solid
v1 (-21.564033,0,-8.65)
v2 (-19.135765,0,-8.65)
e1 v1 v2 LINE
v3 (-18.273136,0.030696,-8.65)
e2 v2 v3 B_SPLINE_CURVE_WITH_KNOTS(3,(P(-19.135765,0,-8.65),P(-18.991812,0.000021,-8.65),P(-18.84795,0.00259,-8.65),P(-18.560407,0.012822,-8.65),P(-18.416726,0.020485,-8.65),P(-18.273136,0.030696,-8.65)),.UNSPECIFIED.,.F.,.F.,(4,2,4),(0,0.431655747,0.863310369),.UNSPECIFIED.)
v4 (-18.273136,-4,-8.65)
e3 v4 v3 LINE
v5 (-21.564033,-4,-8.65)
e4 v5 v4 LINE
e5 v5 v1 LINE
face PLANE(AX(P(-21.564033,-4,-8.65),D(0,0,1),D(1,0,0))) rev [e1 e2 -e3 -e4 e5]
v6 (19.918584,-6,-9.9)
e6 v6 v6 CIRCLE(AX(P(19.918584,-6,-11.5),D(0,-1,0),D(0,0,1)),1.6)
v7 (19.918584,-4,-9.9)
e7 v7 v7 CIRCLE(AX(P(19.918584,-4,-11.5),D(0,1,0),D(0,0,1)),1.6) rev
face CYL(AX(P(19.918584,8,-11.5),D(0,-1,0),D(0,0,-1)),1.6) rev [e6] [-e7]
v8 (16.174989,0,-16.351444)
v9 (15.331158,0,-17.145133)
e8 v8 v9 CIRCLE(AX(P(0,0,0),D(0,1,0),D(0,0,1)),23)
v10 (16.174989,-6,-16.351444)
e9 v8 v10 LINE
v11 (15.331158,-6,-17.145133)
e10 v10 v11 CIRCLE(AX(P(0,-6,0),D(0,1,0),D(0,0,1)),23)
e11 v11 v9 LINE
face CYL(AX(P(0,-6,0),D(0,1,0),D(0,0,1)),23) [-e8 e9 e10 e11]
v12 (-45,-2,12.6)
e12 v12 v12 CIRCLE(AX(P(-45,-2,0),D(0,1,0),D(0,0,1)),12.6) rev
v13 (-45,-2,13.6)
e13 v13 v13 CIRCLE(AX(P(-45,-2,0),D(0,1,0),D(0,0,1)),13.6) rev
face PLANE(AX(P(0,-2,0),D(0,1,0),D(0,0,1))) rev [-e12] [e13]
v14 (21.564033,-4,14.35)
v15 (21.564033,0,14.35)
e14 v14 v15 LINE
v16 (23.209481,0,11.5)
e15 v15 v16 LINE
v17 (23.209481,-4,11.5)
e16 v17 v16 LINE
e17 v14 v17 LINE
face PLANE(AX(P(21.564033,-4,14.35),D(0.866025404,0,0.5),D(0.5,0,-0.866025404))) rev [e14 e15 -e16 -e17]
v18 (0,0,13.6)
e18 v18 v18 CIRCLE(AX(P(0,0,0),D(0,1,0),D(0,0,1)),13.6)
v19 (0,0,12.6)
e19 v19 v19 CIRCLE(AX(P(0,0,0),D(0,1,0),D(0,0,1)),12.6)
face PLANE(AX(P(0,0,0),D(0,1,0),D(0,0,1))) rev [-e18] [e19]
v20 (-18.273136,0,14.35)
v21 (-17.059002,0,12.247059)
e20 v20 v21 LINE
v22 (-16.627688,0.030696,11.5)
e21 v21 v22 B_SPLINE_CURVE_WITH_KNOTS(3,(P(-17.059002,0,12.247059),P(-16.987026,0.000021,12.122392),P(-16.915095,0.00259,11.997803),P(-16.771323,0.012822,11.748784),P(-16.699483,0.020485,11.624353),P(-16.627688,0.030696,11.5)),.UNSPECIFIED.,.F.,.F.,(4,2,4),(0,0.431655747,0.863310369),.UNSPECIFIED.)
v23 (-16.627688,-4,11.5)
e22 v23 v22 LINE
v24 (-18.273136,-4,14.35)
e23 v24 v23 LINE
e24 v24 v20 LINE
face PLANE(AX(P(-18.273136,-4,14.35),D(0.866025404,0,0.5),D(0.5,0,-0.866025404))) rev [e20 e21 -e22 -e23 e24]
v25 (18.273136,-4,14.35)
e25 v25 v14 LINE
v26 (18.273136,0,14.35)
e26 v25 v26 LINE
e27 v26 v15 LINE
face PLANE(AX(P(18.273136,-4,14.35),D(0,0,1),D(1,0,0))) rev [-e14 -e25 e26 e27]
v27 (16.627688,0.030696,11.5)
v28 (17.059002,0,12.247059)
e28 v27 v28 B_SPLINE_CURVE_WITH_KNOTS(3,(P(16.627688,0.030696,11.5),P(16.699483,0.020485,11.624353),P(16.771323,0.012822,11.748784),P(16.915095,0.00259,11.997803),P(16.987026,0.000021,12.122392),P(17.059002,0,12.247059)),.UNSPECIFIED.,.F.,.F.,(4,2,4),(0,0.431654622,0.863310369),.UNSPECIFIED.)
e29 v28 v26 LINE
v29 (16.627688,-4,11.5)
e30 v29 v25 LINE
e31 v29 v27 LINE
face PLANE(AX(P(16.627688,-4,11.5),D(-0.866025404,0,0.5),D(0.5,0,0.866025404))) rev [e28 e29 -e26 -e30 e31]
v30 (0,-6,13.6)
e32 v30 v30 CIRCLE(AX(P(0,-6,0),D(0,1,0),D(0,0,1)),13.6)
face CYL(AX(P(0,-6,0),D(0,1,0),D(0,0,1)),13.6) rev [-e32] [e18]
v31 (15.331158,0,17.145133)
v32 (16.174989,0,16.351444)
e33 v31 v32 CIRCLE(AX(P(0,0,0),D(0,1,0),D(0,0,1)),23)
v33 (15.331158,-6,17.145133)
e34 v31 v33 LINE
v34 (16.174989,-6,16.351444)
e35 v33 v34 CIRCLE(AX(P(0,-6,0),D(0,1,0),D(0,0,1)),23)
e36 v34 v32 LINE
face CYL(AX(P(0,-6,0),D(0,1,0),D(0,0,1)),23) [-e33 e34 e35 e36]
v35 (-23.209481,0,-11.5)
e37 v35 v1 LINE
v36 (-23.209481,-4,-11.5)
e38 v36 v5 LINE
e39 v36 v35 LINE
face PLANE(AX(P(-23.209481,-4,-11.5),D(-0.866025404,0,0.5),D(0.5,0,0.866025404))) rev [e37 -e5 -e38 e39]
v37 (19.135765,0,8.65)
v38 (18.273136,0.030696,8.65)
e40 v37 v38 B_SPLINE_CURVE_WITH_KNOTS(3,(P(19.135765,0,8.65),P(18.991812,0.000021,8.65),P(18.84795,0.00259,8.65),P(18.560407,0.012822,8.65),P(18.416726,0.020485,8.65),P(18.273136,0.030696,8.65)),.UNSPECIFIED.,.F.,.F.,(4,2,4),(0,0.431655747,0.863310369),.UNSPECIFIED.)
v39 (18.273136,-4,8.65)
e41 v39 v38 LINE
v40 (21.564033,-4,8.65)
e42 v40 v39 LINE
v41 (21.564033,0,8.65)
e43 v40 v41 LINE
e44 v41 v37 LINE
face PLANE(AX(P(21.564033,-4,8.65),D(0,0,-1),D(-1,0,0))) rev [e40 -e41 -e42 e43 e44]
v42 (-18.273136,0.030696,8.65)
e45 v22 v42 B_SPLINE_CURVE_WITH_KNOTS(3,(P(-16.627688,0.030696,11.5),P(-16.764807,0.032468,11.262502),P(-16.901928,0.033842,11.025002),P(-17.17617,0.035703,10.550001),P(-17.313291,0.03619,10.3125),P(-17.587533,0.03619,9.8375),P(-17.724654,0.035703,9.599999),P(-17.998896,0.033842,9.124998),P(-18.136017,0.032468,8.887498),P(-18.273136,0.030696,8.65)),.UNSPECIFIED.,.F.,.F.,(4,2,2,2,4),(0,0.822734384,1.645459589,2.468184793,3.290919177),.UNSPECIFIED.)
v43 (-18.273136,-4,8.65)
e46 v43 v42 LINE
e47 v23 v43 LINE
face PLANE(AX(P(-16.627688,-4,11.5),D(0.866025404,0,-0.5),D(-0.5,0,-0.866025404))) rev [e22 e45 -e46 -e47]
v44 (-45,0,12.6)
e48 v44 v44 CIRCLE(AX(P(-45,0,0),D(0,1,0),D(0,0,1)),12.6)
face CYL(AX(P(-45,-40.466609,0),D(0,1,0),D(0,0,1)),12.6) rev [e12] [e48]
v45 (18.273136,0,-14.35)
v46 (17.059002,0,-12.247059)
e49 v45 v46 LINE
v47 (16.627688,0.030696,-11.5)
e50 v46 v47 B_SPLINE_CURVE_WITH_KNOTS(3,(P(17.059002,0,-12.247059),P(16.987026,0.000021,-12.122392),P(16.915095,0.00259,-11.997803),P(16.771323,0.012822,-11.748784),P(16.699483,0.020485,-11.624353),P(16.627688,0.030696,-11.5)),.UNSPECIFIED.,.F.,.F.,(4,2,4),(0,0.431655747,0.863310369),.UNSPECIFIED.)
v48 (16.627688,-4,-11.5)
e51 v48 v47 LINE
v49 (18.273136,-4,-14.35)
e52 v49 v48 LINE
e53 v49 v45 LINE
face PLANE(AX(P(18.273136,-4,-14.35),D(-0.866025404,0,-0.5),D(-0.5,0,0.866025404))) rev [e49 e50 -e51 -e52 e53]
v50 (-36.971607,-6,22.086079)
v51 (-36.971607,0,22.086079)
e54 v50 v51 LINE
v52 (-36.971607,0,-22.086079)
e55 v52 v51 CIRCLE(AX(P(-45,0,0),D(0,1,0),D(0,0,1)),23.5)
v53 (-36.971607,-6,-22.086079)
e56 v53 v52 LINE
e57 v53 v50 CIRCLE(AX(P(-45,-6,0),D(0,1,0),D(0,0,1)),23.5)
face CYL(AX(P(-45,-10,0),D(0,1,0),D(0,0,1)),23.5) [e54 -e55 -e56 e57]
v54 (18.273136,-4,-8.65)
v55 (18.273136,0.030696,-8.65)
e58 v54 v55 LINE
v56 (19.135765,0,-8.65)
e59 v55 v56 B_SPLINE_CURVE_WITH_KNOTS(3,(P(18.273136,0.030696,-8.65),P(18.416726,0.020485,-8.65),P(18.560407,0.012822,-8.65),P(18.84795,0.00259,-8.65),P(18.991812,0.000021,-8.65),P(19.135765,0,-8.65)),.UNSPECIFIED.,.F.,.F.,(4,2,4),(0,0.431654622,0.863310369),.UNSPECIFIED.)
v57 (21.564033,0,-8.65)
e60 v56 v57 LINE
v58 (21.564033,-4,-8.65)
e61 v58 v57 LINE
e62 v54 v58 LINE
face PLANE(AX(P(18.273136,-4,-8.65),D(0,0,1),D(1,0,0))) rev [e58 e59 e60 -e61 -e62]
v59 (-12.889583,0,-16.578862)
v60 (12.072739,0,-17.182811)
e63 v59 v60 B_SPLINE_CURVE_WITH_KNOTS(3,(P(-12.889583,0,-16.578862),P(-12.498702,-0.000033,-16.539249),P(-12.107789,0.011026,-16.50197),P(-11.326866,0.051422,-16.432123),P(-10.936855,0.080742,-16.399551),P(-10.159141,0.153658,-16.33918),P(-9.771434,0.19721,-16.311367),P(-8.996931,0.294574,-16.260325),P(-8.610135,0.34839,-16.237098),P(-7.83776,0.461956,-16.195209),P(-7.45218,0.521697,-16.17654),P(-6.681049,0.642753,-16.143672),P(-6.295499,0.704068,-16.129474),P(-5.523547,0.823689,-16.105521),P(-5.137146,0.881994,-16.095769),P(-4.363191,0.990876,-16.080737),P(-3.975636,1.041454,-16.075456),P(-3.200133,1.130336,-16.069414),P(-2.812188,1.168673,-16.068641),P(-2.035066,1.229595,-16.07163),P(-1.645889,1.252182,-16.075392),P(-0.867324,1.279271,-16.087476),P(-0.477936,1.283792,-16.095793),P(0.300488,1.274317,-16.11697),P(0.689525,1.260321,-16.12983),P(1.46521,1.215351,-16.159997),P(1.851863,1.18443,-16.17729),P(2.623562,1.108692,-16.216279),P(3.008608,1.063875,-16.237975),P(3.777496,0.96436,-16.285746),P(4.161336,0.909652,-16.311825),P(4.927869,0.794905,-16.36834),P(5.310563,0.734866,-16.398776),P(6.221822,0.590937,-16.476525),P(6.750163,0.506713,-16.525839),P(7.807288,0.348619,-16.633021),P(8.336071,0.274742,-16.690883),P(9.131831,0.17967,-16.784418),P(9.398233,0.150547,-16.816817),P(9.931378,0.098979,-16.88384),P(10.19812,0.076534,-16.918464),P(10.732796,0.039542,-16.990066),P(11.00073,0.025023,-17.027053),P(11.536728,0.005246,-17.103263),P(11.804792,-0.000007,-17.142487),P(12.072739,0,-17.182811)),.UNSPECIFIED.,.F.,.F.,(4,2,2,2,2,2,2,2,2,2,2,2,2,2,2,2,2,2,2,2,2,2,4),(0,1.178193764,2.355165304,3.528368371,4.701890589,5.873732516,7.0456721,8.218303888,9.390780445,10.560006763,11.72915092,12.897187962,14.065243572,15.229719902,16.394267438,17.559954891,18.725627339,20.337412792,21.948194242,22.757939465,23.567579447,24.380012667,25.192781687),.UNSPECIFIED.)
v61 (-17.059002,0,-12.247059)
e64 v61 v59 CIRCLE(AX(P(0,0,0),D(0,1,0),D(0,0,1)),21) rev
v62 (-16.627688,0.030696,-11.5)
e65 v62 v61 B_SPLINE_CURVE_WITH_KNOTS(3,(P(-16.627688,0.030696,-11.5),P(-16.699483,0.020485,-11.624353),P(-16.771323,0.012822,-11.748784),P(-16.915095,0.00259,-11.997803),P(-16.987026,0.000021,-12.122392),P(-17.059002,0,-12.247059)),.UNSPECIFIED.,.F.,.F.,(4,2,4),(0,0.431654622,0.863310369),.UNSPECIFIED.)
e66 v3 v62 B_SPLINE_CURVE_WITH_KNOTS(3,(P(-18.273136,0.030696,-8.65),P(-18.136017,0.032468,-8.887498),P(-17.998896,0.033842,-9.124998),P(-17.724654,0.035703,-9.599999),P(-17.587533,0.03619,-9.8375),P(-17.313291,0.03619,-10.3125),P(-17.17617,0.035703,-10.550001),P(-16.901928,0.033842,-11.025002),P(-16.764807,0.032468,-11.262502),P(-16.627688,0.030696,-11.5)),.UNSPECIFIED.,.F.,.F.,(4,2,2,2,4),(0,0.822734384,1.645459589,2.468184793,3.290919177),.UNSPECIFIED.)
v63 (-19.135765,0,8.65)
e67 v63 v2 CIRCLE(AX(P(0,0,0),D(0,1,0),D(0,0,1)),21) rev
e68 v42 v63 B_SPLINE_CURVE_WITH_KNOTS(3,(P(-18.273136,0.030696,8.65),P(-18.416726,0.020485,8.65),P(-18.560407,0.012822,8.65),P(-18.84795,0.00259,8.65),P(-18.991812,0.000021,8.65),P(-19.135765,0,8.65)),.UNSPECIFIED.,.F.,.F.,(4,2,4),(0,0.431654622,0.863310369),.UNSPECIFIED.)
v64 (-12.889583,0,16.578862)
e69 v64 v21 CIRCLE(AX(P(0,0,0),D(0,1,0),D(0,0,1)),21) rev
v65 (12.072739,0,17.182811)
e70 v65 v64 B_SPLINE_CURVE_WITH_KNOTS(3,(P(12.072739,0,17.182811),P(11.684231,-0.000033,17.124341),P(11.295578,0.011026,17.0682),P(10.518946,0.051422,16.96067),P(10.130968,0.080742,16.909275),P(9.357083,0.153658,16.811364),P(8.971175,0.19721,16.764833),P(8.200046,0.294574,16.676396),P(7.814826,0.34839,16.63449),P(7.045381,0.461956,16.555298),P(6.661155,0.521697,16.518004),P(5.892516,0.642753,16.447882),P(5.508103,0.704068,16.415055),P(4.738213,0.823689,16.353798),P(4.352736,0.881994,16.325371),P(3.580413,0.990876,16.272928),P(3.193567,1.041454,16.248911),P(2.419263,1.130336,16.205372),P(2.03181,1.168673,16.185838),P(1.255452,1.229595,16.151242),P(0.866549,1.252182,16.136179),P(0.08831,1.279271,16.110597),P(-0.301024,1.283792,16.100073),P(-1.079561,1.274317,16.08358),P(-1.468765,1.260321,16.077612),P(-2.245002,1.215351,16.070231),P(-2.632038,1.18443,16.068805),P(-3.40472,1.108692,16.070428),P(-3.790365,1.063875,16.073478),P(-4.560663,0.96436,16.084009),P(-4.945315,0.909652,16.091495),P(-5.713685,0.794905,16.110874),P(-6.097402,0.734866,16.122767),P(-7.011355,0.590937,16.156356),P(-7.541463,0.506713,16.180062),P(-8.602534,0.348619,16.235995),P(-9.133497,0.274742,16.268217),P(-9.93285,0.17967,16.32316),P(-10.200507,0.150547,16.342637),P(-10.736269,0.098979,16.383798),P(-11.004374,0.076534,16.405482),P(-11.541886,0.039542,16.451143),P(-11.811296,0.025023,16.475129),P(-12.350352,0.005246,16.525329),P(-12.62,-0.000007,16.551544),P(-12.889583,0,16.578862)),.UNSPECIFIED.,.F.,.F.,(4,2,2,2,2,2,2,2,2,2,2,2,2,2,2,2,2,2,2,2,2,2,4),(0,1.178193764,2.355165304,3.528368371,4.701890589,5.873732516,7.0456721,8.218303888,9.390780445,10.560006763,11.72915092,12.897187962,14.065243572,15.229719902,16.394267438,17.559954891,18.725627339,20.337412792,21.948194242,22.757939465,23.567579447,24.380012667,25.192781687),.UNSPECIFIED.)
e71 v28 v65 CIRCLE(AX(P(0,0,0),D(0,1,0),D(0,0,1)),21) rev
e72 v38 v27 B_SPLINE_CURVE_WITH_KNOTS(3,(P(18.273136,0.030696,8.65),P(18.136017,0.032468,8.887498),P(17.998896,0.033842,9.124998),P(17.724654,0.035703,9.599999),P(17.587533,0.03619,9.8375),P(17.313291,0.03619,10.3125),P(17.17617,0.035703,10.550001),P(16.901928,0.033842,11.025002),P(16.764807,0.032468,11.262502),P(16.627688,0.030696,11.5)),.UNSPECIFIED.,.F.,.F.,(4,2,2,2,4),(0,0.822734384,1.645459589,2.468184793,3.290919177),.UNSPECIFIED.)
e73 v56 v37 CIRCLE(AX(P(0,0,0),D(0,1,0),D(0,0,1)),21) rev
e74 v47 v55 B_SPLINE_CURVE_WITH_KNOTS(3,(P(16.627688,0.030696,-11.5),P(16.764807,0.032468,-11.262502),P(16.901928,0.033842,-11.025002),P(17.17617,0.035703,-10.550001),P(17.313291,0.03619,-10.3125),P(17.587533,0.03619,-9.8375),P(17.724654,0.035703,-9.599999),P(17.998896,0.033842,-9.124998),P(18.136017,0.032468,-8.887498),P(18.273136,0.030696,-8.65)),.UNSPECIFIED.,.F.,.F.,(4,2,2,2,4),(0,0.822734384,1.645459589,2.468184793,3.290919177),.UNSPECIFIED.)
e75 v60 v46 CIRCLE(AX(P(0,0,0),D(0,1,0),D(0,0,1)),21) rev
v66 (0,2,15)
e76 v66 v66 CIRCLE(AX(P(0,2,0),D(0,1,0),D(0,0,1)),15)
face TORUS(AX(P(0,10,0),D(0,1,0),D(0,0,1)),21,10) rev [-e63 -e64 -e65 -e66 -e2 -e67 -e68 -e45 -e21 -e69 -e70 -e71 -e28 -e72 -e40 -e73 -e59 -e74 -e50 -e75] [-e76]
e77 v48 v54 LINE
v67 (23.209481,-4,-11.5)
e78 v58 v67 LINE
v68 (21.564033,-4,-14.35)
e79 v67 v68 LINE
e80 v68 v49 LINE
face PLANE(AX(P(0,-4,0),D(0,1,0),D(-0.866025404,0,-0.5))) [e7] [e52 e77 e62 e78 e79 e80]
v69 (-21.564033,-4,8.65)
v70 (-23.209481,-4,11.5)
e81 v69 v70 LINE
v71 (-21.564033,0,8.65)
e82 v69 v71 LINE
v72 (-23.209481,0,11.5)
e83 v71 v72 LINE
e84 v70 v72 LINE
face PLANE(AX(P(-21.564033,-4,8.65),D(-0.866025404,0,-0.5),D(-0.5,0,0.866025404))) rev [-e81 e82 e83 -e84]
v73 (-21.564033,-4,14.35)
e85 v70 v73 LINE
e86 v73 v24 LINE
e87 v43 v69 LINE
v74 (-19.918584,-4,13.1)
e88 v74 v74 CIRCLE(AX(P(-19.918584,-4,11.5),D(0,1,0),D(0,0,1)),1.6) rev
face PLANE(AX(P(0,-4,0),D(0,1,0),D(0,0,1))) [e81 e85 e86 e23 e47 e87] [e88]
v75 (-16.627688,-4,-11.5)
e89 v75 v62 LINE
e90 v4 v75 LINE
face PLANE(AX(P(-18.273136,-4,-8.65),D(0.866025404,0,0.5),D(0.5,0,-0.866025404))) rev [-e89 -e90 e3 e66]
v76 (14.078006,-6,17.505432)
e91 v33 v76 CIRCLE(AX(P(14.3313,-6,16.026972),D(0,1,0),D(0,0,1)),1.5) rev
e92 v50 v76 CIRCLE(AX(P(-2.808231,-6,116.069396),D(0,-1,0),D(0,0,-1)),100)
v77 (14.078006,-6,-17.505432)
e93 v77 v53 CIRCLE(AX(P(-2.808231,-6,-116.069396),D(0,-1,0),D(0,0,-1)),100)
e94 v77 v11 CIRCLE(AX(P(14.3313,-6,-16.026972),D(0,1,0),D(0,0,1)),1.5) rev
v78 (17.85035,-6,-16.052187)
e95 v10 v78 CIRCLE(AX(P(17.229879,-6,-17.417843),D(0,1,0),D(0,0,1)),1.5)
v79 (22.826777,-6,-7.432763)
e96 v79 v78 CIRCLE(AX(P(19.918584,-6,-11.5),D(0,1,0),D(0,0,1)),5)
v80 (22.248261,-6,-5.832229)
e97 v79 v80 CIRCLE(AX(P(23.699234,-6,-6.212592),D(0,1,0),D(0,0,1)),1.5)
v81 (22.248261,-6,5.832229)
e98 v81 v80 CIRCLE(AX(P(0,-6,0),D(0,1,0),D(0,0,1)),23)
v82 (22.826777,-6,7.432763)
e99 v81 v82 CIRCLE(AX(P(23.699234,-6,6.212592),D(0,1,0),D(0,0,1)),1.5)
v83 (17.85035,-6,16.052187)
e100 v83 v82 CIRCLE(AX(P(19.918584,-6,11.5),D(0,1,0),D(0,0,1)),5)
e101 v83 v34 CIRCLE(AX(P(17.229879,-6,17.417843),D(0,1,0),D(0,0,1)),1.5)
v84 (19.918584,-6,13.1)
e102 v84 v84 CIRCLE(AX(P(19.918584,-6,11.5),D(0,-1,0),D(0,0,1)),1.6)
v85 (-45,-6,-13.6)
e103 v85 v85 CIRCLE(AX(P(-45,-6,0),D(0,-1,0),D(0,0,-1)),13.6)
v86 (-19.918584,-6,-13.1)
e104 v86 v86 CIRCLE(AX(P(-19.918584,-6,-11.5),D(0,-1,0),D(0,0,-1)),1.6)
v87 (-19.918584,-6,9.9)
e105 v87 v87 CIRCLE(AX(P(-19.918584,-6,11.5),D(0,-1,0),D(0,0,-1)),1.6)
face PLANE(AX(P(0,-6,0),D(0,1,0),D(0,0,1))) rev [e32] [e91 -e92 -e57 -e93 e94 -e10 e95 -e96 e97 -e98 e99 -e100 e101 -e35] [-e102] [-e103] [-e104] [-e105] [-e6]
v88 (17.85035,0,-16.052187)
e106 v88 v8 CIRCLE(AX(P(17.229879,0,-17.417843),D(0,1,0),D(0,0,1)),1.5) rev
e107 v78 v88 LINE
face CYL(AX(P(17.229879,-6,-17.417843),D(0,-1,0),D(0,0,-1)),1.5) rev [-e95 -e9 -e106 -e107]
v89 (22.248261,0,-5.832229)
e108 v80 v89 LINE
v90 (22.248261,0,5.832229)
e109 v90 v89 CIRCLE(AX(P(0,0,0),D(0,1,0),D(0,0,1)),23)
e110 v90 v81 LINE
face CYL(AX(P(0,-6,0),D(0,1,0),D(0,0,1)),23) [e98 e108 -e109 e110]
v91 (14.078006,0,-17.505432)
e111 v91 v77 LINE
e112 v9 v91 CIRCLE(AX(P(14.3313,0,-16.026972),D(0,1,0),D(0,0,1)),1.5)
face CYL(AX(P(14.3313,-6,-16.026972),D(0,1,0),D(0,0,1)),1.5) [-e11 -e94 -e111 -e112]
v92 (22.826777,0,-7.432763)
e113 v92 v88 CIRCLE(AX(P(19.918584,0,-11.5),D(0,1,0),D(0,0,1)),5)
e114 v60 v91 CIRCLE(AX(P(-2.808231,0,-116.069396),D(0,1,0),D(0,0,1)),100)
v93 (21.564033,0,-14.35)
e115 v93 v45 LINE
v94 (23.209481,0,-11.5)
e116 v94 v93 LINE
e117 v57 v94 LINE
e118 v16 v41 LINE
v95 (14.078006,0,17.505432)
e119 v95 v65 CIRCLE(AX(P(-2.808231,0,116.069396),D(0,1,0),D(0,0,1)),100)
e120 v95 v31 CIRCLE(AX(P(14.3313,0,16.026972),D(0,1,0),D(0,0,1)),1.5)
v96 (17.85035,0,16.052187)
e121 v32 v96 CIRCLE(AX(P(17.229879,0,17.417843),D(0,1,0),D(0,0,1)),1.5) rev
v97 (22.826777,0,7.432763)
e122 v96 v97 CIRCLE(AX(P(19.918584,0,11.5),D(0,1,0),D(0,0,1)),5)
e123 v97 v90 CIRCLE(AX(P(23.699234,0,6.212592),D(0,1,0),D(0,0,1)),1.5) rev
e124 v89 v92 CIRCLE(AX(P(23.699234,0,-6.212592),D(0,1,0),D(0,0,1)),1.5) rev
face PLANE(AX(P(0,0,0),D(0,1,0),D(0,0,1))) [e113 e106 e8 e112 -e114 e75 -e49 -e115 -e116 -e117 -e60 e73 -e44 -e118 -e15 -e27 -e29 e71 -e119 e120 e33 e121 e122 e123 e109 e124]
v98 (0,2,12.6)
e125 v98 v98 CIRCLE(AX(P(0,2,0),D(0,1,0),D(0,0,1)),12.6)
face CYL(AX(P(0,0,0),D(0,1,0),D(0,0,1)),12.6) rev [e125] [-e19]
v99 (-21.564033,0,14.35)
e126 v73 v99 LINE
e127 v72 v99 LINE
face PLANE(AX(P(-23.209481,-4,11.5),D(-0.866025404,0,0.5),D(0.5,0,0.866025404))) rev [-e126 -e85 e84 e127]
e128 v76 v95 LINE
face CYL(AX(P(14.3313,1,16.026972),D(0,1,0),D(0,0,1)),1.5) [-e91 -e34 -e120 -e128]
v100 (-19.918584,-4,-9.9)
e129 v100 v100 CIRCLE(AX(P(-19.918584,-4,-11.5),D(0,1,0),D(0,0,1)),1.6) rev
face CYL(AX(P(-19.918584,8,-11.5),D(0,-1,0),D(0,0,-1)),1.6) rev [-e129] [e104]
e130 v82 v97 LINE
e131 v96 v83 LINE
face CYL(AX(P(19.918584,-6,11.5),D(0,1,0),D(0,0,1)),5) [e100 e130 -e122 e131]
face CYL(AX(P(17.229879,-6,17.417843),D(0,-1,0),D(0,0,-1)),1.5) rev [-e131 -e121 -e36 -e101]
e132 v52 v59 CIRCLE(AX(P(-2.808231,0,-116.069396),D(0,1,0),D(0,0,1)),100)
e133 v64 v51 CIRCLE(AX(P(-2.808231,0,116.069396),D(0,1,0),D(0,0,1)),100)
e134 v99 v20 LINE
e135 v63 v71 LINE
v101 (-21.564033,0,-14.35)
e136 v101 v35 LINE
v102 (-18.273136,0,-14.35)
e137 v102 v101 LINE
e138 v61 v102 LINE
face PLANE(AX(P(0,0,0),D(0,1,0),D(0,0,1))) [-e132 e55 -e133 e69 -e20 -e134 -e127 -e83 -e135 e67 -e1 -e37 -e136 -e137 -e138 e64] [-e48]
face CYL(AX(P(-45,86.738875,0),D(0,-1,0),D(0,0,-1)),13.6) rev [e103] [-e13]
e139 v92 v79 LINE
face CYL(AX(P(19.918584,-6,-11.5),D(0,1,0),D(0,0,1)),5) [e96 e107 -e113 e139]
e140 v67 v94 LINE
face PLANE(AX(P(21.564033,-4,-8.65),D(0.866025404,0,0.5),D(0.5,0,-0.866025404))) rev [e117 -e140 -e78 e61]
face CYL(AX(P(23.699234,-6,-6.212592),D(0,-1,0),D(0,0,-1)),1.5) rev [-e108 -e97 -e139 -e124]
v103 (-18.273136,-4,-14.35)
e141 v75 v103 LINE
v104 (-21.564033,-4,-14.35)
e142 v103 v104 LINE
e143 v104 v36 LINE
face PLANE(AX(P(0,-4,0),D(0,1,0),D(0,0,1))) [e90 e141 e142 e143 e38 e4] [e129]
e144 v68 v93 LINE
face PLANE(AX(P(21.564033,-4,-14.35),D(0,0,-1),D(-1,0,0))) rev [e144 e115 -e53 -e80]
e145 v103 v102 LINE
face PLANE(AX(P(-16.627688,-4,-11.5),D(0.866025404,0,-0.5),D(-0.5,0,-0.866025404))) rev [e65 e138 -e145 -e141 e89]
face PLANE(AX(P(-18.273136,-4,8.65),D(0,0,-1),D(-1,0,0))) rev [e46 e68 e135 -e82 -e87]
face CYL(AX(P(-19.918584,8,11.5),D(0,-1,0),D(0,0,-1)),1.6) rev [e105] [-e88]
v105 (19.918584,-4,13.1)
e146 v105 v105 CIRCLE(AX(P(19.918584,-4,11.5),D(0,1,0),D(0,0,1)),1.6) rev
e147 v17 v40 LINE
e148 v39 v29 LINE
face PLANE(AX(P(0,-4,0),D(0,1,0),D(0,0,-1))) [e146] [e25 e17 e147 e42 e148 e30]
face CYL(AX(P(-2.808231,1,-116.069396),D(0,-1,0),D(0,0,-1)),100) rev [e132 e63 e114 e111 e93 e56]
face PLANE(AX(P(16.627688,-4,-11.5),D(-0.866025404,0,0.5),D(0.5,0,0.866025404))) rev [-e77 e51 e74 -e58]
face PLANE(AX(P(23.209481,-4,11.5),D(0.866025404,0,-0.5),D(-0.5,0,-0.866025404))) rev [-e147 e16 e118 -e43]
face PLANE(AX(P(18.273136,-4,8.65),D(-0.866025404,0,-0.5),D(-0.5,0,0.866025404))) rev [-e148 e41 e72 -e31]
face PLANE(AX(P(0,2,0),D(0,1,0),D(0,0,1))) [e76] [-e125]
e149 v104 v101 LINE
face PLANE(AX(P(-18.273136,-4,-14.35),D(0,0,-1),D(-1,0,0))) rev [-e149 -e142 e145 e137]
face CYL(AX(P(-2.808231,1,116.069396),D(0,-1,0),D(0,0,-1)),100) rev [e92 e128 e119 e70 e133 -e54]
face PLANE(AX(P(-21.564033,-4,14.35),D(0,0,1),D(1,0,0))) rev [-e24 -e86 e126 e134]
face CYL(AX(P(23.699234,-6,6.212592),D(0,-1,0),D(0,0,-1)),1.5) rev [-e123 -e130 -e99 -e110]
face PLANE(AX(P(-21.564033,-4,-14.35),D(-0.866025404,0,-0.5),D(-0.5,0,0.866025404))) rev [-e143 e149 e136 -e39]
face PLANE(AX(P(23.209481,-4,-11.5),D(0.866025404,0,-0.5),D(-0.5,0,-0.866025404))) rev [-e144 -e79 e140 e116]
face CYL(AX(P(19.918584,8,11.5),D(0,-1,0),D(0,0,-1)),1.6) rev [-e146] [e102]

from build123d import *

# Parameters (mm, degrees)
SKETCH_1_R               = 23
SKETCH_1_R_2             = 13.6
SKETCH_1_R_3             = 5
EXTRUDE_1_DEPTH          = 6
CUT_EXTRUDE_1_DEPTH      = 14
PATTERN_CIRCULAR_1_COUNT = 2
CUT_EXTRUDE_START        = -7
CUT_EXTRUDE_2_DEPTH      = 7
FILLET_1_R               = 1.5
CUT_EXTRUDE_4_DEPTH      = 4
PATTERN_CIRCULAR_2_COUNT = 6
SKETCH_9_R               = 13.6
SKETCH_9_R_2             = 12.6
EXTRUDE_5_DEPTH          = 2
EXTRUDE_START            = -6
SKETCH_12_R              = 13.6
EXTRUDE_6_DEPTH          = 6
CUT_EXTRUDE_5_DEPTH      = 10
SKETCH_17_R              = 13.6
SKETCH_17_R_2            = 12.6
EXTRUDE_7_DEPTH          = 2
EXTRUDE_START_2          = 2
SKETCH_18_R              = 15
SKETCH_18_R_2            = 13.6
EXTRUDE_8_DEPTH          = 2
SKETCH_19_R              = 13.6
CUT_EXTRUDE_6_DEPTH      = 2
SKETCH_20_R              = 13.6
SKETCH_20_R_2            = 12.6
EXTRUDE_9_DEPTH          = 2
FILLET_2_R               = 10


with BuildPart() as part:
    # 草图1 → 凸台-拉伸1 (new body)
    # profile 1 of 5: a face of its own
    with BuildSketch(Plane(origin=(0, 0, 0), x_dir=(1, 0, 0), z_dir=(0, 1, 0))):
        Circle(SKETCH_1_R)
        with Locations(Location((0, 0, 0), (0, 0, 270))):
            Circle(SKETCH_1_R_2, mode=Mode.SUBTRACT)
    # profile 2 of 5: a face of its own
    with BuildSketch(Plane(origin=(0, 0, 0), x_dir=(1, 0, 0), z_dir=(0, 1, 0))):
        with Locations((-19.918584287, -11.5)):
            Circle(SKETCH_1_R_3)
    # profile 3 of 5: a face of its own
    with BuildSketch(Plane(origin=(0, 0, 0), x_dir=(1, 0, 0), z_dir=(0, 1, 0))):
        with Locations((19.918584287, -11.5)):
            Circle(SKETCH_1_R_3)
    # profile 4 of 5: a face of its own
    with BuildSketch(Plane(origin=(0, 0, 0), x_dir=(1, 0, 0), z_dir=(0, 1, 0))):
        with Locations((19.918584287, 11.5)):
            Circle(SKETCH_1_R_3)
    # profile 5 of 5: a face of its own
    with BuildSketch(Plane(origin=(0, 0, 0), x_dir=(1, 0, 0), z_dir=(0, 1, 0))):
        with Locations((-19.918584287, 11.5)):
            Circle(SKETCH_1_R_3)
    extrude(amount=-EXTRUDE_1_DEPTH)

    # 草图2 → 切除-拉伸1 (cut)
    with BuildSketch(Plane.XZ.offset(6)):
        with BuildLine():
            ThreePointArc((-19.918584287, 9.9), (-18.787213437, 10.36862915), (-18.318584287, 11.5))
            Line((-18.318584287, 11.5), (-19.918584287, 11.5))
            Line((-19.918584287, 11.5), (-19.918584287, 9.9))
        make_face()
        with BuildLine():
            Line((-19.918584287, 11.5), (-18.318584287, 11.5))
            ThreePointArc((-18.318584287, 11.5), (-21.049955137, 12.63137085), (-19.918584287, 9.9))
            Line((-19.918584287, 9.9), (-19.918584287, 11.5))
        make_face()
        with BuildLine():
            ThreePointArc((-19.918584287, 9.9), (-18.787213437, 10.36862915), (-18.318584287, 11.5))
            Line((-18.318584287, 11.5), (-19.918584287, 11.5))
            Line((-19.918584287, 11.5), (-19.918584287, 9.9))
        make_face()
        with BuildLine():
            Line((-19.918584287, 11.5), (-18.318584287, 11.5))
            ThreePointArc((-18.318584287, 11.5), (-21.049955137, 12.63137085), (-19.918584287, 9.9))
            Line((-19.918584287, 9.9), (-19.918584287, 11.5))
        make_face()
        with BuildLine():
            ThreePointArc((-19.918584287, -9.9), (-21.049955137, -12.63137085), (-18.318584287, -11.5))
            Line((-18.318584287, -11.5), (-19.918584287, -11.5))
            Line((-19.918584287, -11.5), (-19.918584287, -9.9))
        make_face()
        with BuildLine():
            Line((-19.918584287, -11.5), (-18.318584287, -11.5))
            ThreePointArc((-18.318584287, -11.5), (-18.787213437, -10.36862915), (-19.918584287, -9.9))
            Line((-19.918584287, -9.9), (-19.918584287, -11.5))
        make_face()
        with BuildLine():
            ThreePointArc((-19.918584287, -9.9), (-21.049955137, -12.63137085), (-18.318584287, -11.5))
            Line((-18.318584287, -11.5), (-19.918584287, -11.5))
            Line((-19.918584287, -11.5), (-19.918584287, -9.9))
        make_face()
        with BuildLine():
            Line((-19.918584287, -11.5), (-18.318584287, -11.5))
            ThreePointArc((-18.318584287, -11.5), (-18.787213437, -10.36862915), (-19.918584287, -9.9))
            Line((-19.918584287, -9.9), (-19.918584287, -11.5))
        make_face()
    cut_extrude_1 = extrude(amount=-CUT_EXTRUDE_1_DEPTH, mode=Mode.SUBTRACT)

    # 阵列(圆周)1: 切除-拉伸1 ×2 about axis
    pattern_circular_1_axis = Axis((0, 0, 0), (0, 1, 0))
    for i in range(1, PATTERN_CIRCULAR_1_COUNT):
        add(cut_extrude_1.rotate(pattern_circular_1_axis, i * 360 / PATTERN_CIRCULAR_1_COUNT), mode=Mode.SUBTRACT)

    # 草图3 → 切除-拉伸2 (cut)
    with BuildSketch(Plane.XZ.offset(6).offset(CUT_EXTRUDE_START)):
        with BuildLine():
            ThreePointArc((14.774295945, 17.627256716), (-0.556308738, 22.993271202), (-15.609472524, 16.892139223))
            ThreePointArc((-15.609472524, 16.892139223), (-0.389497448, 16.098651419), (14.774295945, 17.627256716))
        make_face()
        with BuildLine():
            ThreePointArc((-15.609472524, -16.892139223), (-0.556308738, -22.993271202), (14.774295945, -17.627256716))
            ThreePointArc((14.774295945, -17.627256716), (-0.389497448, -16.098651419), (-15.609472524, -16.892139223))
        make_face()
    extrude(amount=CUT_EXTRUDE_2_DEPTH, mode=Mode.SUBTRACT)

    # 圆角1
    fillet_1_edges = [part.edges().sort_by_distance(p)[0] for p in [
        (16.962730619, -3, 15.532732212),
        (-16.962730619, -3, 15.532732212),
        (-21.933105995, -3, 6.923789527),
        (-21.933105995, -3, -6.923789527),
        (-16.962730619, -3, -15.532732212),
        (16.962730619, -3, -15.532732212),
        (21.933105995, -3, -6.923789527),
        (21.933105995, -3, 6.923789527),
        (-15.609472524, -3, 16.892139223),
        (14.774295945, -3, 17.627256716),
        (14.774295945, -3, -17.627256716),
        (-15.609472524, -3, -16.892139223),
    ]]
    fillet(fillet_1_edges, radius=FILLET_1_R)

    # 草图8 → 切除-拉伸4 (cut)
    with BuildSketch(Plane(origin=(0, 0, 0), x_dir=(1, 0, 0), z_dir=(0, 1, 0))):
        Polygon((-16.627687753, 11.5), (-18.27313602, 14.35), (-21.564032554, 14.35), (-23.209480821, 11.5), (-21.564032554, 8.65), (-18.27313602, 8.65), align=None)
        Polygon((-16.627687753, -11.5), (-18.27313602, -8.65), (-21.564032554, -8.65), (-23.209480821, -11.5), (-21.564032554, -14.35), (-18.27313602, -14.35), align=None)
    cut_extrude_4 = extrude(amount=-CUT_EXTRUDE_4_DEPTH, mode=Mode.SUBTRACT)

    # 阵列(圆周)2: 切除-拉伸4 ×6 about axis
    pattern_circular_2_axis = Axis((0, -6, 0), (0, 1, 0))
    for i in range(1, PATTERN_CIRCULAR_2_COUNT):
        add(cut_extrude_4.rotate(pattern_circular_2_axis, i * 360 / PATTERN_CIRCULAR_2_COUNT), mode=Mode.SUBTRACT)

    # 草图9 → 凸台-拉伸5 (add)
    with BuildSketch(Plane(origin=(0, 0, 0), x_dir=(1, 0, 0), z_dir=(0, 1, 0))):
        with Locations(Location((0, 0, 0), (0, 0, 270))):
            Circle(SKETCH_9_R)
        with Locations(Location((0, 0, 0), (0, 0, 270))):
            Circle(SKETCH_9_R_2, mode=Mode.SUBTRACT)
    extrude(amount=-EXTRUDE_5_DEPTH)

    # 草图12 → 凸台-拉伸6 (add)
    with BuildSketch(Plane.XZ.offset(6).offset(EXTRUDE_START)):
        with BuildLine():
            ThreePointArc((-22.248260717, -5.832228997), (-22.811291025, -2.940238384), (-23, 0))
            ThreePointArc((-23, 0), (-22.811291025, 2.940238384), (-22.248260717, 5.832228997))
            add(Edge.make_bspline(
                [(-22.248260717, 5.832228997), (-22.226619665, 5.914783328), (-22.210406286, 6.000567583), (-22.200301184, 6.08895497), (-22.196856608, 6.179069987), (-22.203815662, 6.361083038), (-22.214272651, 6.452988829), (-22.231966608, 6.544597585), (-22.256853878, 6.634773116), (-22.320260087, 6.810194045), (-22.358779966, 6.895442045), (-22.403747133, 6.97719285), (-22.454468707, 7.054544935), (-22.565491839, 7.198943839), (-22.625757329, 7.266030738), (-22.690039488, 7.327530717), (-22.757353921, 7.383123694), (-22.82677656, 7.432762891)],
                knots=[0, 0, 0, 0, 0, 0, 0.249516802, 0.249516802, 0.249516802, 0.249516802, 0.5, 0.5, 0.5, 0.5, 0.750483198, 0.750483198, 0.750483198, 0.750483198, 1, 1, 1, 1, 1, 1], degree=5))
            ThreePointArc((-22.82677656, 7.432762891), (-24.248711306, 14), (-17.850349764, 16.052186942))
            add(Edge.make_bspline(
                [(-16.174988831, 16.351444472), (-16.235662453, 16.291425606), (-16.301847107, 16.234492281), (-16.373340279, 16.181547312), (-16.449659884, 16.133506713), (-16.610767338, 16.048526906), (-16.695588582, 16.011630028), (-16.78377107, 15.981149066), (-16.874309005, 15.957614309), (-17.057931091, 15.924815232), (-17.151017964, 15.915550426), (-17.244299822, 15.913617732), (-17.336649479, 15.918867862), (-17.517214164, 15.942817262), (-17.605445868, 15.961465258), (-17.690847492, 15.986385251), (-17.772649638, 16.016884771), (-17.850349764, 16.052186942)],
                knots=[0, 0, 0, 0, 0, 0, 0.249516802, 0.249516802, 0.249516802, 0.249516802, 0.5, 0.5, 0.5, 0.5, 0.750483198, 0.750483198, 0.750483198, 0.750483198, 1, 1, 1, 1, 1, 1], degree=5))
            ThreePointArc((-16.174988831, 16.351444472), (-16.158686082, 16.367555227), (-16.142367286, 16.383649728))
            add(Edge.make_bspline(
                [(-14.908106077, 16.804129822), (-14.972885852, 16.81202611), (-15.038864386, 16.816493362), (-15.105701752, 16.817319749), (-15.172995405, 16.814358801), (-15.307724426, 16.800752886), (-15.375160188, 16.790098491), (-15.442197946, 16.775544774), (-15.508388889, 16.75713699), (-15.638241935, 16.712899498), (-15.701904385, 16.687069671), (-15.763884644, 16.657670367), (-15.823799619, 16.62493974), (-15.938814144, 16.553464646), (-15.993919762, 16.514727405), (-16.046351845, 16.473269076), (-16.09588099, 16.429451419), (-16.142367286, 16.383649728)],
                knots=[0, 0, 0, 0, 0, 0, 0.2498464, 0.2498464, 0.2498464, 0.2498464, 0.5, 0.5, 0.5, 0.5, 0.7501536, 0.7501536, 0.7501536, 0.7501536, 1, 1, 1, 1, 1, 1], degree=5))
            ThreePointArc((-14.908106077, 16.804129822), (-11.733789584, 16.468520252), (-8.550378912, 16.234393207))
            Line((-8.550378912, 16.234393207), (-8.550378912, 23.501770851))
            Line((-8.550378912, 23.501770851), (-81.449621088, 23.501770851))
            Line((-81.449621088, 23.501770851), (-81.449621088, -23.501770851))
            Line((-81.449621088, -23.501770851), (-8.550378912, -23.501770851))
            Line((-8.550378912, -23.501770851), (-8.550378912, -16.234393207))
            ThreePointArc((-8.550378912, -16.234393207), (-11.733789584, -16.468520252), (-14.908106077, -16.804129822))
            add(Edge.make_bspline(
                [(-14.908106077, -16.804129822), (-14.972885852, -16.81202611), (-15.038864386, -16.816493362), (-15.105701752, -16.817319749), (-15.172995405, -16.814358801), (-15.307724426, -16.800752886), (-15.375160188, -16.790098491), (-15.442197946, -16.775544774), (-15.508388889, -16.75713699), (-15.638241935, -16.712899498), (-15.701904385, -16.687069671), (-15.763884644, -16.657670367), (-15.823799619, -16.62493974), (-15.938814144, -16.553464646), (-15.993919762, -16.514727405), (-16.046351845, -16.473269076), (-16.09588099, -16.429451419), (-16.142367286, -16.383649728)],
                knots=[0, 0, 0, 0, 0, 0, 0.2498464, 0.2498464, 0.2498464, 0.2498464, 0.5, 0.5, 0.5, 0.5, 0.7501536, 0.7501536, 0.7501536, 0.7501536, 1, 1, 1, 1, 1, 1], degree=5))
            ThreePointArc((-16.142367286, -16.383649728), (-16.158686082, -16.367555227), (-16.174988831, -16.351444472))
            add(Edge.make_bspline(
                [(-17.850349764, -16.052186942), (-17.772649638, -16.016884771), (-17.690847492, -15.986385251), (-17.605445868, -15.961465258), (-17.517214164, -15.942817262), (-17.336649479, -15.918867862), (-17.244299822, -15.913617732), (-17.151017964, -15.915550426), (-17.057931091, -15.924815232), (-16.874309005, -15.957614309), (-16.78377107, -15.981149066), (-16.695588582, -16.011630028), (-16.610767338, -16.048526906), (-16.449659884, -16.133506713), (-16.373340279, -16.181547312), (-16.301847107, -16.234492281), (-16.235662453, -16.291425606), (-16.174988831, -16.351444472)],
                knots=[0, 0, 0, 0, 0, 0, 0.249516802, 0.249516802, 0.249516802, 0.249516802, 0.5, 0.5, 0.5, 0.5, 0.750483198, 0.750483198, 0.750483198, 0.750483198, 1, 1, 1, 1, 1, 1], degree=5))
            ThreePointArc((-17.850349764, -16.052186942), (-24.248711306, -14), (-22.82677656, -7.432762891))
            add(Edge.make_bspline(
                [(-22.248260717, -5.832228997), (-22.226619665, -5.914783328), (-22.210406286, -6.000567583), (-22.200301184, -6.08895497), (-22.196856608, -6.179069987), (-22.203815662, -6.361083038), (-22.214272651, -6.452988829), (-22.231966608, -6.544597585), (-22.256853878, -6.634773116), (-22.320260087, -6.810194045), (-22.358779966, -6.895442045), (-22.403747133, -6.97719285), (-22.454468707, -7.054544935), (-22.565491839, -7.198943839), (-22.625757329, -7.266030738), (-22.690039488, -7.327530717), (-22.757353921, -7.383123694), (-22.82677656, -7.432762891)],
                knots=[0, 0, 0, 0, 0, 0, 0.249516802, 0.249516802, 0.249516802, 0.249516802, 0.5, 0.5, 0.5, 0.5, 0.750483198, 0.750483198, 0.750483198, 0.750483198, 1, 1, 1, 1, 1, 1], degree=5))
        make_face()
        with Locations(Location((-45, 0, 0), (0, 0, 270))):
            Circle(SKETCH_12_R, mode=Mode.SUBTRACT)
    extrude(amount=EXTRUDE_6_DEPTH)

    # 草图15 → 切除-拉伸5 (cut)
    with BuildSketch(Plane(origin=(0, 0, 0), x_dir=(1, 0, 0), z_dir=(0, 1, 0))):
        with BuildLine():
            Line((-8.550378912, -23.501770851), (-8.550378912, -16.234393207))
            ThreePointArc((-8.550378912, -16.234393207), (-22.974373049, -18.123866434), (-36.971607829, -22.08607976))
            ThreePointArc((-36.971607829, -22.08607976), (-68.5, 7.94e-07), (-36.971606336, 22.086079217))
            ThreePointArc((-36.971606336, 22.086079217), (-22.974372271, 18.123866274), (-8.550378912, 16.234393207))
            Line((-8.550378912, 16.234393207), (-8.550378912, 23.501770851))
            Line((-8.550378912, 23.501770851), (-81.449621088, 23.501770851))
            Line((-81.449621088, 23.501770851), (-81.449621088, -23.501770851))
            Line((-81.449621088, -23.501770851), (-8.550378912, -23.501770851))
        make_face()
    extrude(amount=-CUT_EXTRUDE_5_DEPTH, mode=Mode.SUBTRACT)

    # 草图17 → 凸台-拉伸7 (add)
    with BuildSketch(Plane(origin=(0, 0, 0), x_dir=(1, 0, 0), z_dir=(0, 1, 0))):
        with Locations(Location((-45, 0, 0), (0, 0, 90))):
            Circle(SKETCH_17_R)
        with Locations(Location((-45, 0, 0), (0, 0, 270))):
            Circle(SKETCH_17_R_2, mode=Mode.SUBTRACT)
    extrude(amount=-EXTRUDE_7_DEPTH)

    # 草图18 → 凸台-拉伸8 (add)
    with BuildSketch(Plane(origin=(0, 0, 0), x_dir=(1, 0, 0), z_dir=(0, 1, 0)).offset(EXTRUDE_START_2)):
        with Locations(Location((0, 0, 0), (0, 0, 270))):
            Circle(SKETCH_18_R)
        with Locations(Location((0, 0, 0), (0, 0, 270))):
            Circle(SKETCH_18_R_2, mode=Mode.SUBTRACT)
    extrude(amount=-EXTRUDE_8_DEPTH)

    # 草图19 → 切除-拉伸6 (cut)
    with BuildSketch(Plane(origin=(0, 0, 0), x_dir=(1, 0, 0), z_dir=(0, 1, 0))):
        with Locations(Location((0, 0, 0), (0, 0, 270))):
            Circle(SKETCH_19_R)
    extrude(amount=-CUT_EXTRUDE_6_DEPTH, mode=Mode.SUBTRACT)


with BuildPart() as body_2:
    # 草图20 → 凸台-拉伸9 (new body)
    with BuildSketch(Plane(origin=(0, 2, 0), x_dir=(1, 0, 0), z_dir=(0, 1, 0))):
        with Locations(Location((0, 0, 0), (0, 0, 270))):
            Circle(SKETCH_20_R)
        with Locations(Location((0, 0, 0), (0, 0, 270))):
            Circle(SKETCH_20_R_2, mode=Mode.SUBTRACT)
    extrude(amount=-EXTRUDE_9_DEPTH)

    # Combine 1: union part
    add(part.part)

    # 圆角2
    # the kernel refuses this fillet: 10 mm, written as the material it adds along each edge
    with BuildSketch(Plane(origin=(0, 0, 0), x_dir=(0, 0, 1), z_dir=(-1, 0, 0))) as fillet_2_piece_1_section:
        with BuildLine():
            CenterArc((21, 10), FILLET_2_R, 233.130102354, 36.869897646)
            Line((15, 2), (15, 0))
            Line((15, 0), (21, 0))
        make_face()
    fillet_2_piece_1 = revolve(axis=Axis((0, 0, 0), (0, 1, 0)), mode=Mode.PRIVATE)
    fillet_2_piece_1 = fillet_2_piece_1 - Plane(origin=(-2.80823109, 0, 116.069395778), x_dir=(-0.12801241433859908, 0, -0.9917725655487768), z_dir=(0, 1, 0)) * Cylinder(100, 85, mode=Mode.PRIVATE)
    fillet_2_piece_1 = fillet_2_piece_1 - Plane(origin=(-2.80823109, 0, -116.069395778), x_dir=(-0.34163375246116695, 0, 0.9398331656093555), z_dir=(0, 1, 0)) * Cylinder(100, 85, mode=Mode.PRIVATE)
    fillet_2_piece_1 = split(fillet_2_piece_1, bisect_by=Plane(origin=(-17.450411886, 0, 10.075), z_dir=(0.8660254037844383, 0, -0.5000000000000009)), keep=Keep.TOP, mode=Mode.PRIVATE)
    fillet_2_piece_1 = split(fillet_2_piece_1, bisect_by=Plane(origin=(17.450411886, 0, 10.075), z_dir=(-0.866025403784439, 0, -0.49999999999999933)), keep=Keep.TOP, mode=Mode.PRIVATE)
    fillet_2_piece_1 = split(fillet_2_piece_1, bisect_by=Plane(origin=(-17.450411886, 0, -10.075), z_dir=(0.8660254037844385, 0, 0.5000000000000002)), keep=Keep.TOP, mode=Mode.PRIVATE)
    fillet_2_piece_1 = split(fillet_2_piece_1, bisect_by=Plane(origin=(17.450411886, 0, -10.075), z_dir=(-0.8660254037844382, 0, 0.5000000000000007)), keep=Keep.TOP, mode=Mode.PRIVATE)
    add(fillet_2_piece_1)
    with BuildSketch(Plane(origin=(0, 0, 0), x_dir=(0, 0, 1), z_dir=(-1, 0, 0))) as fillet_2_piece_2_section:
        with BuildLine():
            CenterArc((21, 10), FILLET_2_R, 233.130102354, 36.869897646)
            Line((15, 2), (15, 0))
            Line((15, 0), (21, 0))
        make_face()
    fillet_2_piece_2 = revolve(axis=Axis((0, 0, 0), (0, 1, 0)), mode=Mode.PRIVATE)
    fillet_2_piece_2 = fillet_2_piece_2 - Plane(origin=(-2.80823109, 0, 116.069395778), x_dir=(-0.12801241433859908, 0, -0.9917725655487768), z_dir=(0, 1, 0)) * Cylinder(100, 85, mode=Mode.PRIVATE)
    fillet_2_piece_2 = split(fillet_2_piece_2, bisect_by=Plane(origin=(-17.450411886, 0, 10.075), z_dir=(0.8660254037844383, 0, -0.5000000000000009)), keep=Keep.TOP, mode=Mode.PRIVATE)
    fillet_2_piece_2 = split(fillet_2_piece_2, bisect_by=Plane(origin=(7.491119743, 0, -4.325), z_dir=(-0.8660254037844388, 0, 0.49999999999999983)), keep=Keep.TOP, mode=Mode.PRIVATE)
    fillet_2_piece_2 = split(fillet_2_piece_2, bisect_by=Plane(origin=(0, 0, -8.65), z_dir=(0, 0, 1)), keep=Keep.TOP, mode=Mode.PRIVATE)
    add(fillet_2_piece_2)
    with BuildSketch(Plane(origin=(0, 0, 0), x_dir=(0, 0, 1), z_dir=(-1, 0, 0))) as fillet_2_piece_3_section:
        with BuildLine():
            CenterArc((21, 10), FILLET_2_R, 233.130102354, 36.869897646)
            Line((15, 2), (15, 0))
            Line((15, 0), (21, 0))
        make_face()
    fillet_2_piece_3 = revolve(axis=Axis((0, 0, 0), (0, 1, 0)), mode=Mode.PRIVATE)
    fillet_2_piece_3 = fillet_2_piece_3 - Plane(origin=(-2.80823109, 0, 116.069395778), x_dir=(-0.12801241433859908, 0, -0.9917725655487768), z_dir=(0, 1, 0)) * Cylinder(100, 85, mode=Mode.PRIVATE)
    fillet_2_piece_3 = fillet_2_piece_3 - Plane(origin=(-2.80823109, 0, -116.069395778), x_dir=(-0.34163375246116695, 0, 0.9398331656093555), z_dir=(0, 1, 0)) * Cylinder(100, 85, mode=Mode.PRIVATE)
    fillet_2_piece_3 = split(fillet_2_piece_3, bisect_by=Plane(origin=(-7.491119743, 0, -4.325), z_dir=(0.8660254037844384, 0, 0.5000000000000007)), keep=Keep.TOP, mode=Mode.PRIVATE)
    fillet_2_piece_3 = split(fillet_2_piece_3, bisect_by=Plane(origin=(7.491119743, 0, 4.325), z_dir=(-0.8660254037844383, 0, -0.5000000000000008)), keep=Keep.TOP, mode=Mode.PRIVATE)
    add(fillet_2_piece_3)
    with BuildSketch(Plane(origin=(0, 0, 0), x_dir=(0, 0, 1), z_dir=(-1, 0, 0))) as fillet_2_piece_4_section:
        with BuildLine():
            CenterArc((21, 10), FILLET_2_R, 233.130102354, 36.869897646)
            Line((15, 2), (15, 0))
            Line((15, 0), (21, 0))
        make_face()
    fillet_2_piece_4 = revolve(axis=Axis((0, 0, 0), (0, 1, 0)), mode=Mode.PRIVATE)
    fillet_2_piece_4 = split(fillet_2_piece_4, bisect_by=Plane(origin=(0, 0, 8.65), z_dir=(0, 0, -1)), keep=Keep.TOP, mode=Mode.PRIVATE)
    fillet_2_piece_4 = split(fillet_2_piece_4, bisect_by=Plane(origin=(0, 0, -8.65), z_dir=(0, 0, 1)), keep=Keep.TOP, mode=Mode.PRIVATE)
    add(fillet_2_piece_4)
    with BuildSketch(Plane(origin=(0, 0, 0), x_dir=(0, 0, 1), z_dir=(-1, 0, 0))) as fillet_2_piece_5_section:
        with BuildLine():
            CenterArc((21, 10), FILLET_2_R, 233.130102354, 36.869897646)
            Line((15, 2), (15, 0))
            Line((15, 0), (21, 0))
        make_face()
    fillet_2_piece_5 = revolve(axis=Axis((0, 0, 0), (0, 1, 0)), mode=Mode.PRIVATE)
    fillet_2_piece_5 = split(fillet_2_piece_5, bisect_by=Plane(origin=(-7.491119743, 0, 4.325), z_dir=(0.8660254037844384, 0, -0.5000000000000004)), keep=Keep.TOP, mode=Mode.PRIVATE)
    fillet_2_piece_5 = split(fillet_2_piece_5, bisect_by=Plane(origin=(-17.450411886, 0, -10.075), z_dir=(-0.8660254037844385, 0, -0.5000000000000002)), keep=Keep.TOP, mode=Mode.PRIVATE)
    add(fillet_2_piece_5)


solid = body_2.part
